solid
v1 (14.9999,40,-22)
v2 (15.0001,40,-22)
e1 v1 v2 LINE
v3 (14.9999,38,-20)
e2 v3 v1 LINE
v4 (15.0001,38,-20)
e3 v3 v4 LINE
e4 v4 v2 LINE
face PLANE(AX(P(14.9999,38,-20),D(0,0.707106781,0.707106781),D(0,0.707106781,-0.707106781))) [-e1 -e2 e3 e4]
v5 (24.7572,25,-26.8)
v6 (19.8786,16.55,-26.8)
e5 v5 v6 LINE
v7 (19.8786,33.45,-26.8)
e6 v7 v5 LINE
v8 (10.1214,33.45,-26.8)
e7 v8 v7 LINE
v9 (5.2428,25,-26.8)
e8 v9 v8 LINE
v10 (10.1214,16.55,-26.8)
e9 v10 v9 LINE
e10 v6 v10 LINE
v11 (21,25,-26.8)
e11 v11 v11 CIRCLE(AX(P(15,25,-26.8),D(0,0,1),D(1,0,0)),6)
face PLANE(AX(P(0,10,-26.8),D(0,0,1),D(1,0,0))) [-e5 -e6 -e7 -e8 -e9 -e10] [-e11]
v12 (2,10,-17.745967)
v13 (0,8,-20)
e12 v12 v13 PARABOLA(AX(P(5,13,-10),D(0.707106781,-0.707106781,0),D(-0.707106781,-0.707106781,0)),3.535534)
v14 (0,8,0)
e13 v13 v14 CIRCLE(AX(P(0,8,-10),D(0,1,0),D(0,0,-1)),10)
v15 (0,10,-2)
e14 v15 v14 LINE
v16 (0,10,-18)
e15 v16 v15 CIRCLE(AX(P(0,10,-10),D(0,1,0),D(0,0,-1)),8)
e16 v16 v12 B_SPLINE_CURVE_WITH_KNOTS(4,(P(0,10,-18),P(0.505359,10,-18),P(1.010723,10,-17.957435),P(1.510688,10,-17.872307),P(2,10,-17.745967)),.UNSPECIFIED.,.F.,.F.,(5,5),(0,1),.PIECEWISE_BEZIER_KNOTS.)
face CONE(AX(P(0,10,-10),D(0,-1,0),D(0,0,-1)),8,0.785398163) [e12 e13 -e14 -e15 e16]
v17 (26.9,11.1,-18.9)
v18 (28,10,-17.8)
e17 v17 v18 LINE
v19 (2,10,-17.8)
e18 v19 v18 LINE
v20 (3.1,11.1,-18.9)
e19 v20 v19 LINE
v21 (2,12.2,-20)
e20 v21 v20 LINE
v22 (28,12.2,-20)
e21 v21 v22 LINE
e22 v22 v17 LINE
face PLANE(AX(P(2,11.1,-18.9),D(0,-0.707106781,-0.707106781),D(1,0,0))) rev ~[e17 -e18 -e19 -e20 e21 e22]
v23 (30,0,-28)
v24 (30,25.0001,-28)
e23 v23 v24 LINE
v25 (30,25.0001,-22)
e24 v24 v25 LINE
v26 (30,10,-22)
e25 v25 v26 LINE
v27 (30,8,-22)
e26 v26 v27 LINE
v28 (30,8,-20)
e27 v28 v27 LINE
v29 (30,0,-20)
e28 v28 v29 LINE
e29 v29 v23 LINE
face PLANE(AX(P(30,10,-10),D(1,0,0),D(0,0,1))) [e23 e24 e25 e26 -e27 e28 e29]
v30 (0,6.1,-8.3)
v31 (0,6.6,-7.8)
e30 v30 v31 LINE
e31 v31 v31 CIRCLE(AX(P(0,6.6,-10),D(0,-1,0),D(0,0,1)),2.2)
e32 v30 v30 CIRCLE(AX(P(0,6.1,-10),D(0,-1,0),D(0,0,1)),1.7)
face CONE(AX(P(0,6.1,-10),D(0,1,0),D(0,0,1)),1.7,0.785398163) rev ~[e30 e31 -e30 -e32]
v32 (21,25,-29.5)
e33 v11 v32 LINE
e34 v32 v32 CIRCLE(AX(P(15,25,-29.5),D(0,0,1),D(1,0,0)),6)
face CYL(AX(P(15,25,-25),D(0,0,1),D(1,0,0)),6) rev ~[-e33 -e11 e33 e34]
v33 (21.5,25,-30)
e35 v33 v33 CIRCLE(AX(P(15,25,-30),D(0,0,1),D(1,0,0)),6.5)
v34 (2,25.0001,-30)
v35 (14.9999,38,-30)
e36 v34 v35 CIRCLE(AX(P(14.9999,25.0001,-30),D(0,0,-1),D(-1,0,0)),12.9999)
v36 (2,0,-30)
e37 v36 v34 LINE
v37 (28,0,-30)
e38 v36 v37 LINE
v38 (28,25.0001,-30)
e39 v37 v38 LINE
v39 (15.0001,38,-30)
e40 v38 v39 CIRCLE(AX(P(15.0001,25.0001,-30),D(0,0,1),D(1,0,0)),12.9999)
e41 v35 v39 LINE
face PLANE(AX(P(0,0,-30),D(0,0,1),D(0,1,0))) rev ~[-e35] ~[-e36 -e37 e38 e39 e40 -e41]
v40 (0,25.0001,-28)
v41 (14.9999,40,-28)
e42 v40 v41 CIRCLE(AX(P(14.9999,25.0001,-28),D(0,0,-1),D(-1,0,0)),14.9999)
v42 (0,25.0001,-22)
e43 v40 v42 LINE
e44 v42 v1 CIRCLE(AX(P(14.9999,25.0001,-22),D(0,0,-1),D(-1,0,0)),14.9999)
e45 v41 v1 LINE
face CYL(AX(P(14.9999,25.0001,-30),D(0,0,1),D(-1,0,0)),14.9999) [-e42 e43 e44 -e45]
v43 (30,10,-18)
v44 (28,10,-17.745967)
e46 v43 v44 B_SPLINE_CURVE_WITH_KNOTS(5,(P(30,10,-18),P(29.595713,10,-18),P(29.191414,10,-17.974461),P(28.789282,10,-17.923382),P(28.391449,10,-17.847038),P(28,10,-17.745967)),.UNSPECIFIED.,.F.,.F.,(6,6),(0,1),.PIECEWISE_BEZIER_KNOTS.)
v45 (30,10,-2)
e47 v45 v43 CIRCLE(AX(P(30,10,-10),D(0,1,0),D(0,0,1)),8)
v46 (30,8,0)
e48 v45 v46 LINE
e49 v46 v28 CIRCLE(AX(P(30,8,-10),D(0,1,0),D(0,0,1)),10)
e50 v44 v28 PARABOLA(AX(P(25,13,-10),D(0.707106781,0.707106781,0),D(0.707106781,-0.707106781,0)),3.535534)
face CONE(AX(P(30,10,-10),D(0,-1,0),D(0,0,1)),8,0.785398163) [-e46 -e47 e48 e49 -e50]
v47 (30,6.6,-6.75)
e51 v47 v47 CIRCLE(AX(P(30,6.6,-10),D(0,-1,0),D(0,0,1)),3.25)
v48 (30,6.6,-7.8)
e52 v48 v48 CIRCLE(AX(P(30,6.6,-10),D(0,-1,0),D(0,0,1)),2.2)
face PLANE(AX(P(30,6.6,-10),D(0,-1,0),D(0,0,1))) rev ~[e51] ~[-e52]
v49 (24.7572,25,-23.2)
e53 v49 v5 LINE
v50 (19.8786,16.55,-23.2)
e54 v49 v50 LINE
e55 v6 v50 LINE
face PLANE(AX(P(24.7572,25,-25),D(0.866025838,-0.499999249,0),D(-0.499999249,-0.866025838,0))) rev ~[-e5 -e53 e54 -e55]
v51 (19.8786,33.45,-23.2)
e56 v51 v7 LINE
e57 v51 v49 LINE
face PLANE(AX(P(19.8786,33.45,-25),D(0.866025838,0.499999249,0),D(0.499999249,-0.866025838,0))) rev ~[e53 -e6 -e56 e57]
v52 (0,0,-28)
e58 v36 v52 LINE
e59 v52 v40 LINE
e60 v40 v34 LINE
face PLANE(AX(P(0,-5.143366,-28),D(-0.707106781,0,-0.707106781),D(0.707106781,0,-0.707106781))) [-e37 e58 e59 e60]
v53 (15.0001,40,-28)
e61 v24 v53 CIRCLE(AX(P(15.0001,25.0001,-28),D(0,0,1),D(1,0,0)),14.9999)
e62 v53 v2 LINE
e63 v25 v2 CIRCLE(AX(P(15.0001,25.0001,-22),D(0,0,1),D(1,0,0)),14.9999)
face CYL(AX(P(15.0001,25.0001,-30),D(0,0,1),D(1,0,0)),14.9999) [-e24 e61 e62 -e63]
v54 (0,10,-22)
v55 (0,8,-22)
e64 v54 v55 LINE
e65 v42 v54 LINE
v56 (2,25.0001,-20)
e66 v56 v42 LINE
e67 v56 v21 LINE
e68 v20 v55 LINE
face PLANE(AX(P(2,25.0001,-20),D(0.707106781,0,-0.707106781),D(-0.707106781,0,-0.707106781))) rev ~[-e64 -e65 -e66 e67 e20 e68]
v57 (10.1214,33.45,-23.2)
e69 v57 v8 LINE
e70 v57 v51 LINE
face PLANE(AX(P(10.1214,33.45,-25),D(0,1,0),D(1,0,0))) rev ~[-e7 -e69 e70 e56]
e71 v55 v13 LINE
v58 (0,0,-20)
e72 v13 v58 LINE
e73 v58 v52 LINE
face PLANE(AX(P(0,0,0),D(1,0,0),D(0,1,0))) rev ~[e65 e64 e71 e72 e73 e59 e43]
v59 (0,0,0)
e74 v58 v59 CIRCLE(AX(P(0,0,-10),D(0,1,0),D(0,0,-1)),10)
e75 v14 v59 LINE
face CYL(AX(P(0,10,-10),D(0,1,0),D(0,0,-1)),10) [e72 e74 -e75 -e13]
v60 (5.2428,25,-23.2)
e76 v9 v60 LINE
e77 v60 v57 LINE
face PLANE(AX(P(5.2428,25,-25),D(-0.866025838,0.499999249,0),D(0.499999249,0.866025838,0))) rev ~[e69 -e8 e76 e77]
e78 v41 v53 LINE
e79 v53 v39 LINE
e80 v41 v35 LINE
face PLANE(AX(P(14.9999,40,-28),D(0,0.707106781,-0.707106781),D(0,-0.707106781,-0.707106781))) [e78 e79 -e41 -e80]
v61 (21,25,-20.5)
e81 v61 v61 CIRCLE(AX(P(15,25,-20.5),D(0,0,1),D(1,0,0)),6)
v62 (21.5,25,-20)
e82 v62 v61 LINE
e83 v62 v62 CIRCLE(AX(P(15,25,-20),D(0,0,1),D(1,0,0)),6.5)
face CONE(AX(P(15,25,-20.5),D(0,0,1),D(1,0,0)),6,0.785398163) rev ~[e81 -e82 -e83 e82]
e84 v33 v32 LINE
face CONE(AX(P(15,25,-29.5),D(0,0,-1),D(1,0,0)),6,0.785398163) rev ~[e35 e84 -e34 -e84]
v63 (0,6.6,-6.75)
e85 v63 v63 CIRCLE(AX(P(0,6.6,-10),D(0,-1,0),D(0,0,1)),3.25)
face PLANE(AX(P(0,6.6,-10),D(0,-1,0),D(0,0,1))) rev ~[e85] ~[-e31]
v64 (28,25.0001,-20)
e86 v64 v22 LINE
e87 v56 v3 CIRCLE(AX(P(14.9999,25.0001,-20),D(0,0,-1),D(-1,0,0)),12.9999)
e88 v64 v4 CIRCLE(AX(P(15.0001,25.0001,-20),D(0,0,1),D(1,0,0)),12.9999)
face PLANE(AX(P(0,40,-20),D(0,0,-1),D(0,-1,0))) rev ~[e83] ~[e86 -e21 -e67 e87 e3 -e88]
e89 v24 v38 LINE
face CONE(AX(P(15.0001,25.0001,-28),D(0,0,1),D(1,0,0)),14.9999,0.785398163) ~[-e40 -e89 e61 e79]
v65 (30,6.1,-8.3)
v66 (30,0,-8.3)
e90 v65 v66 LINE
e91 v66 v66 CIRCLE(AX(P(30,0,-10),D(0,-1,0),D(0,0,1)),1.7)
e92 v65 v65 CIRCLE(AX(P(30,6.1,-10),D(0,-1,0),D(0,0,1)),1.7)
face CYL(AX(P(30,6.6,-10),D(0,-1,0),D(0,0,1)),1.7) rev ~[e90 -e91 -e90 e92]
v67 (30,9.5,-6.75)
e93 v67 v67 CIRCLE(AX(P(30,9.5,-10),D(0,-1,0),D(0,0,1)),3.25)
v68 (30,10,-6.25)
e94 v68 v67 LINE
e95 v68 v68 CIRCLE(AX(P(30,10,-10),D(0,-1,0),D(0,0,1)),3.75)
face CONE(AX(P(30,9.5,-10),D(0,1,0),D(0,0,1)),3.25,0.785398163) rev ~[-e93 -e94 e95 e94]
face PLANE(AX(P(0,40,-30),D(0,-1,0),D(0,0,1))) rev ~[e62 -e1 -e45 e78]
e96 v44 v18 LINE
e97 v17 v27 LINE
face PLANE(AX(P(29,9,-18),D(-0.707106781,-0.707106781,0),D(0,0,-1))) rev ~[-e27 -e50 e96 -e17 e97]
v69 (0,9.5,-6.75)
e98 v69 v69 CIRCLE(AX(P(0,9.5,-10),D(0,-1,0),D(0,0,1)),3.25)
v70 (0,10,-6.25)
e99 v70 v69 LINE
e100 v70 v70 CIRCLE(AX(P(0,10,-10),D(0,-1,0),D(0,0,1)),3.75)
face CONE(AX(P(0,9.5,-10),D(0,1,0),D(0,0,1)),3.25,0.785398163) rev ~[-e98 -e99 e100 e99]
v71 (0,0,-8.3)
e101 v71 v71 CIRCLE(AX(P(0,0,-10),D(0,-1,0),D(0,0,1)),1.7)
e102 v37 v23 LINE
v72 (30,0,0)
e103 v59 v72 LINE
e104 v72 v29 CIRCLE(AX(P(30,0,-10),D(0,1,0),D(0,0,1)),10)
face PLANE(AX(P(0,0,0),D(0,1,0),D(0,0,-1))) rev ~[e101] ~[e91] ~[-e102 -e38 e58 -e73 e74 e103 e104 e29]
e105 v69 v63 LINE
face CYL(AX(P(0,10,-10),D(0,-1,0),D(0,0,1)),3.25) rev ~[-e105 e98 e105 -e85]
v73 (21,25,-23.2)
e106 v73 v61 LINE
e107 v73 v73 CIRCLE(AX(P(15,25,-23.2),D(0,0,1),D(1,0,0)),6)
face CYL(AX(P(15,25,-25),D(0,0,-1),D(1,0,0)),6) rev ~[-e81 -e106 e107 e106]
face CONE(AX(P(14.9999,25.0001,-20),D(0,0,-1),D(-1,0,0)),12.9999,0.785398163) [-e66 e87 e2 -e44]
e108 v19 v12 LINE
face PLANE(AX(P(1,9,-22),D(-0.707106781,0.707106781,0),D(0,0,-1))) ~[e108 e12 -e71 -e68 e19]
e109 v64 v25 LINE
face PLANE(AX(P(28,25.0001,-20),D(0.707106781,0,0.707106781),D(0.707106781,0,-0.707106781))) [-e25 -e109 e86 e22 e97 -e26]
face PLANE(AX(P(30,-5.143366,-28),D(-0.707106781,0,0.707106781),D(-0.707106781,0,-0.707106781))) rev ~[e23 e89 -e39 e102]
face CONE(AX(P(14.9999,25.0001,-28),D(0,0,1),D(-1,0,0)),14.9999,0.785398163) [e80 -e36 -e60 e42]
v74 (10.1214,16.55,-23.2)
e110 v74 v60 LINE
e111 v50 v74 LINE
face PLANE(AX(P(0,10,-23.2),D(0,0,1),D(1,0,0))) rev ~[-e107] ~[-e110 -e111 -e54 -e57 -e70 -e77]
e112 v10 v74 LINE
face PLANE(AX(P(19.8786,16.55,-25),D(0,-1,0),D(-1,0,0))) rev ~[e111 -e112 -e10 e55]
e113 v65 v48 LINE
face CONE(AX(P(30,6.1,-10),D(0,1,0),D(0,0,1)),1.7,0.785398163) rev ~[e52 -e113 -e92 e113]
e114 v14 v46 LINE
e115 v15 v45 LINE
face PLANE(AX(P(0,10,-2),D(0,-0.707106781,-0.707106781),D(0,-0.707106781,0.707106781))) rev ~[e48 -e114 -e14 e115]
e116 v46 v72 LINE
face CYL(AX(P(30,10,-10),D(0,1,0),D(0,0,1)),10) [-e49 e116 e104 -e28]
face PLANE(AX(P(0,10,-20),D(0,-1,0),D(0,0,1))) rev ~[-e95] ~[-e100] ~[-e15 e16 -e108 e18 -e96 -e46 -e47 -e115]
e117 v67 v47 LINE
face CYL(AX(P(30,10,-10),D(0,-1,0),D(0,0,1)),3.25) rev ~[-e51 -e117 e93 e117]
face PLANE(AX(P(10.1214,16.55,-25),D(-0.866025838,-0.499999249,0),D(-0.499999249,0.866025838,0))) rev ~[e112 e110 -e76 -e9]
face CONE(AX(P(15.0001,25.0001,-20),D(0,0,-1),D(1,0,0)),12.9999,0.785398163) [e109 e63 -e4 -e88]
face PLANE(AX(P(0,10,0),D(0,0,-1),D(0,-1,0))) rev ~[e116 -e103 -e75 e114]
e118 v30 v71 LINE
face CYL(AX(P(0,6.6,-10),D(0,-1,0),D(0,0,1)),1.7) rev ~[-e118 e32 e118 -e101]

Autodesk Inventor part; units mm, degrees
ref_plane "YZ Plane" through (0, 0, 0) normal (1, 0, 0) x (0, 1, 0)
ref_plane "XZ Plane" through (0, 0, 0) normal (0, 1, 0) x (-1, 0, 0)
sketch "Skizze1" plane through (0, 0, 0) normal (1, 0, 0) x (0, 1, 0)
  line L0 (0, 0) -> (0, -30)
  line L1 (0, -30) -> (40, -30)
  line L2 (40, -30) -> (40, -20)
  line L3 (40, -20) -> (10, -20)
  line L4 (10, -20) -> (10, 0)
  line L5 (10, 0) -> (0, 0)
  dimension "d0" = 40
  dimension "d1" = 30
  dimension "d2" = 10
  dimension "d3" = 10
extrude "Extrusion1" add sketch "Skizze1" along normal blind 30
ref_plane "Arbeitsebene1" through (0, 10, -25) normal (0, 0, 1) x (1, 0, 0)
sketch "Skizze2" plane through (0, 10, -25) normal (0, 0, 1) x (1, 0, 0)
  line L0 (0, -10) -> (0, 30) projected
  line L1 (0, 30) -> (30, 30) projected
  line L2 (30, -10) -> (30, 30) projected
  line L3 (0, 30) -> (30, 0) construction
  line L4 (30, 30) -> (0, 0) construction
  line L5 (0, 0) -> (30, 0) construction
  line L6 (5.2428, 15) -> (10.1214, 23.45)
  line L7 (10.1214, 23.45) -> (19.8786, 23.45)
  line L8 (19.8786, 23.45) -> (24.7572, 15)
  line L9 (24.7572, 15) -> (19.8786, 6.55)
  line L10 (19.8786, 6.55) -> (10.1214, 6.55)
  line L11 (10.1214, 6.55) -> (5.2428, 15)
  circle A0 centre (15, 15) radius 6
  dimension "d6" = 16.9
  dimension "d9" = 12
extrude "Extrusion2" cut sketch "Skizze2" along normal mid plane 3.6
extrude "Extrusion3" cut sketch "Skizze2" along normal mid plane 10 contours A0
sketch "Skizze3" plane through (0, 10, 0) normal (0, 1, 0) x (1, 0, 0)
  line L0 (0, 20) -> (0, 0) projected
  line L1 (0, 0) -> (30, 0) projected
  line L2 (30, 20) -> (30, 0) projected
  line L3 (0, 20) -> (30, 20) projected
  arc A0 (0, 20) -> (0, 0) centre (0, 10) ccw
  arc A1 (30, 0) -> (30, 20) centre (30, 10) ccw
  point P0 (0, 0)
extrude "Extrusion4" add sketch "Skizze3" against normal up to surface (10 mm away) contours L0 A0 | A1 L2
hole "Bohrung1" at (0, 10, -10) at (30, 10, -10) direction (0, -1, 0) diameter 3.4 end through all counterbore diameter 6.5 counterbore depth 3.4 clearance for "Inbusschraube ISO 4762" size "M3" standard "ISO"
fillet "Rundung1" radius 15 2 edges at (30, 40, -25) (0, 40, -25)
chamfer "Fasen1" distance 2 angle 45 9 edges at (15, 10, 0) (40, 10, -10) (-10, 10, -10) (30, 17.5001, -20) (25.6066, 35.6066, -20) (0, 17.5001, -20) (30, 12.5001, -30) (25.6066, 35.6066, -30) (0, 12.5001, -30)
chamfer "Fasen2" distance 2 angle 45 2 edges at (30, 10, -20) (0, 10, -20)
chamfer "Fasen3" distance 0.5 angle 45 6 edges at (0, 10, -13.25) (30, 10, -13.25) (0, 6.6, -11.7) (30, 6.6, -11.7) (9, 25, -20) (9, 25, -30)
chamfer "Fasen4" distance 2.2 angle 45 1 edges at (15, 10, -20)
properties part number "Sensorhalter_Portal" material "PC/ABS-Kunststoff"
